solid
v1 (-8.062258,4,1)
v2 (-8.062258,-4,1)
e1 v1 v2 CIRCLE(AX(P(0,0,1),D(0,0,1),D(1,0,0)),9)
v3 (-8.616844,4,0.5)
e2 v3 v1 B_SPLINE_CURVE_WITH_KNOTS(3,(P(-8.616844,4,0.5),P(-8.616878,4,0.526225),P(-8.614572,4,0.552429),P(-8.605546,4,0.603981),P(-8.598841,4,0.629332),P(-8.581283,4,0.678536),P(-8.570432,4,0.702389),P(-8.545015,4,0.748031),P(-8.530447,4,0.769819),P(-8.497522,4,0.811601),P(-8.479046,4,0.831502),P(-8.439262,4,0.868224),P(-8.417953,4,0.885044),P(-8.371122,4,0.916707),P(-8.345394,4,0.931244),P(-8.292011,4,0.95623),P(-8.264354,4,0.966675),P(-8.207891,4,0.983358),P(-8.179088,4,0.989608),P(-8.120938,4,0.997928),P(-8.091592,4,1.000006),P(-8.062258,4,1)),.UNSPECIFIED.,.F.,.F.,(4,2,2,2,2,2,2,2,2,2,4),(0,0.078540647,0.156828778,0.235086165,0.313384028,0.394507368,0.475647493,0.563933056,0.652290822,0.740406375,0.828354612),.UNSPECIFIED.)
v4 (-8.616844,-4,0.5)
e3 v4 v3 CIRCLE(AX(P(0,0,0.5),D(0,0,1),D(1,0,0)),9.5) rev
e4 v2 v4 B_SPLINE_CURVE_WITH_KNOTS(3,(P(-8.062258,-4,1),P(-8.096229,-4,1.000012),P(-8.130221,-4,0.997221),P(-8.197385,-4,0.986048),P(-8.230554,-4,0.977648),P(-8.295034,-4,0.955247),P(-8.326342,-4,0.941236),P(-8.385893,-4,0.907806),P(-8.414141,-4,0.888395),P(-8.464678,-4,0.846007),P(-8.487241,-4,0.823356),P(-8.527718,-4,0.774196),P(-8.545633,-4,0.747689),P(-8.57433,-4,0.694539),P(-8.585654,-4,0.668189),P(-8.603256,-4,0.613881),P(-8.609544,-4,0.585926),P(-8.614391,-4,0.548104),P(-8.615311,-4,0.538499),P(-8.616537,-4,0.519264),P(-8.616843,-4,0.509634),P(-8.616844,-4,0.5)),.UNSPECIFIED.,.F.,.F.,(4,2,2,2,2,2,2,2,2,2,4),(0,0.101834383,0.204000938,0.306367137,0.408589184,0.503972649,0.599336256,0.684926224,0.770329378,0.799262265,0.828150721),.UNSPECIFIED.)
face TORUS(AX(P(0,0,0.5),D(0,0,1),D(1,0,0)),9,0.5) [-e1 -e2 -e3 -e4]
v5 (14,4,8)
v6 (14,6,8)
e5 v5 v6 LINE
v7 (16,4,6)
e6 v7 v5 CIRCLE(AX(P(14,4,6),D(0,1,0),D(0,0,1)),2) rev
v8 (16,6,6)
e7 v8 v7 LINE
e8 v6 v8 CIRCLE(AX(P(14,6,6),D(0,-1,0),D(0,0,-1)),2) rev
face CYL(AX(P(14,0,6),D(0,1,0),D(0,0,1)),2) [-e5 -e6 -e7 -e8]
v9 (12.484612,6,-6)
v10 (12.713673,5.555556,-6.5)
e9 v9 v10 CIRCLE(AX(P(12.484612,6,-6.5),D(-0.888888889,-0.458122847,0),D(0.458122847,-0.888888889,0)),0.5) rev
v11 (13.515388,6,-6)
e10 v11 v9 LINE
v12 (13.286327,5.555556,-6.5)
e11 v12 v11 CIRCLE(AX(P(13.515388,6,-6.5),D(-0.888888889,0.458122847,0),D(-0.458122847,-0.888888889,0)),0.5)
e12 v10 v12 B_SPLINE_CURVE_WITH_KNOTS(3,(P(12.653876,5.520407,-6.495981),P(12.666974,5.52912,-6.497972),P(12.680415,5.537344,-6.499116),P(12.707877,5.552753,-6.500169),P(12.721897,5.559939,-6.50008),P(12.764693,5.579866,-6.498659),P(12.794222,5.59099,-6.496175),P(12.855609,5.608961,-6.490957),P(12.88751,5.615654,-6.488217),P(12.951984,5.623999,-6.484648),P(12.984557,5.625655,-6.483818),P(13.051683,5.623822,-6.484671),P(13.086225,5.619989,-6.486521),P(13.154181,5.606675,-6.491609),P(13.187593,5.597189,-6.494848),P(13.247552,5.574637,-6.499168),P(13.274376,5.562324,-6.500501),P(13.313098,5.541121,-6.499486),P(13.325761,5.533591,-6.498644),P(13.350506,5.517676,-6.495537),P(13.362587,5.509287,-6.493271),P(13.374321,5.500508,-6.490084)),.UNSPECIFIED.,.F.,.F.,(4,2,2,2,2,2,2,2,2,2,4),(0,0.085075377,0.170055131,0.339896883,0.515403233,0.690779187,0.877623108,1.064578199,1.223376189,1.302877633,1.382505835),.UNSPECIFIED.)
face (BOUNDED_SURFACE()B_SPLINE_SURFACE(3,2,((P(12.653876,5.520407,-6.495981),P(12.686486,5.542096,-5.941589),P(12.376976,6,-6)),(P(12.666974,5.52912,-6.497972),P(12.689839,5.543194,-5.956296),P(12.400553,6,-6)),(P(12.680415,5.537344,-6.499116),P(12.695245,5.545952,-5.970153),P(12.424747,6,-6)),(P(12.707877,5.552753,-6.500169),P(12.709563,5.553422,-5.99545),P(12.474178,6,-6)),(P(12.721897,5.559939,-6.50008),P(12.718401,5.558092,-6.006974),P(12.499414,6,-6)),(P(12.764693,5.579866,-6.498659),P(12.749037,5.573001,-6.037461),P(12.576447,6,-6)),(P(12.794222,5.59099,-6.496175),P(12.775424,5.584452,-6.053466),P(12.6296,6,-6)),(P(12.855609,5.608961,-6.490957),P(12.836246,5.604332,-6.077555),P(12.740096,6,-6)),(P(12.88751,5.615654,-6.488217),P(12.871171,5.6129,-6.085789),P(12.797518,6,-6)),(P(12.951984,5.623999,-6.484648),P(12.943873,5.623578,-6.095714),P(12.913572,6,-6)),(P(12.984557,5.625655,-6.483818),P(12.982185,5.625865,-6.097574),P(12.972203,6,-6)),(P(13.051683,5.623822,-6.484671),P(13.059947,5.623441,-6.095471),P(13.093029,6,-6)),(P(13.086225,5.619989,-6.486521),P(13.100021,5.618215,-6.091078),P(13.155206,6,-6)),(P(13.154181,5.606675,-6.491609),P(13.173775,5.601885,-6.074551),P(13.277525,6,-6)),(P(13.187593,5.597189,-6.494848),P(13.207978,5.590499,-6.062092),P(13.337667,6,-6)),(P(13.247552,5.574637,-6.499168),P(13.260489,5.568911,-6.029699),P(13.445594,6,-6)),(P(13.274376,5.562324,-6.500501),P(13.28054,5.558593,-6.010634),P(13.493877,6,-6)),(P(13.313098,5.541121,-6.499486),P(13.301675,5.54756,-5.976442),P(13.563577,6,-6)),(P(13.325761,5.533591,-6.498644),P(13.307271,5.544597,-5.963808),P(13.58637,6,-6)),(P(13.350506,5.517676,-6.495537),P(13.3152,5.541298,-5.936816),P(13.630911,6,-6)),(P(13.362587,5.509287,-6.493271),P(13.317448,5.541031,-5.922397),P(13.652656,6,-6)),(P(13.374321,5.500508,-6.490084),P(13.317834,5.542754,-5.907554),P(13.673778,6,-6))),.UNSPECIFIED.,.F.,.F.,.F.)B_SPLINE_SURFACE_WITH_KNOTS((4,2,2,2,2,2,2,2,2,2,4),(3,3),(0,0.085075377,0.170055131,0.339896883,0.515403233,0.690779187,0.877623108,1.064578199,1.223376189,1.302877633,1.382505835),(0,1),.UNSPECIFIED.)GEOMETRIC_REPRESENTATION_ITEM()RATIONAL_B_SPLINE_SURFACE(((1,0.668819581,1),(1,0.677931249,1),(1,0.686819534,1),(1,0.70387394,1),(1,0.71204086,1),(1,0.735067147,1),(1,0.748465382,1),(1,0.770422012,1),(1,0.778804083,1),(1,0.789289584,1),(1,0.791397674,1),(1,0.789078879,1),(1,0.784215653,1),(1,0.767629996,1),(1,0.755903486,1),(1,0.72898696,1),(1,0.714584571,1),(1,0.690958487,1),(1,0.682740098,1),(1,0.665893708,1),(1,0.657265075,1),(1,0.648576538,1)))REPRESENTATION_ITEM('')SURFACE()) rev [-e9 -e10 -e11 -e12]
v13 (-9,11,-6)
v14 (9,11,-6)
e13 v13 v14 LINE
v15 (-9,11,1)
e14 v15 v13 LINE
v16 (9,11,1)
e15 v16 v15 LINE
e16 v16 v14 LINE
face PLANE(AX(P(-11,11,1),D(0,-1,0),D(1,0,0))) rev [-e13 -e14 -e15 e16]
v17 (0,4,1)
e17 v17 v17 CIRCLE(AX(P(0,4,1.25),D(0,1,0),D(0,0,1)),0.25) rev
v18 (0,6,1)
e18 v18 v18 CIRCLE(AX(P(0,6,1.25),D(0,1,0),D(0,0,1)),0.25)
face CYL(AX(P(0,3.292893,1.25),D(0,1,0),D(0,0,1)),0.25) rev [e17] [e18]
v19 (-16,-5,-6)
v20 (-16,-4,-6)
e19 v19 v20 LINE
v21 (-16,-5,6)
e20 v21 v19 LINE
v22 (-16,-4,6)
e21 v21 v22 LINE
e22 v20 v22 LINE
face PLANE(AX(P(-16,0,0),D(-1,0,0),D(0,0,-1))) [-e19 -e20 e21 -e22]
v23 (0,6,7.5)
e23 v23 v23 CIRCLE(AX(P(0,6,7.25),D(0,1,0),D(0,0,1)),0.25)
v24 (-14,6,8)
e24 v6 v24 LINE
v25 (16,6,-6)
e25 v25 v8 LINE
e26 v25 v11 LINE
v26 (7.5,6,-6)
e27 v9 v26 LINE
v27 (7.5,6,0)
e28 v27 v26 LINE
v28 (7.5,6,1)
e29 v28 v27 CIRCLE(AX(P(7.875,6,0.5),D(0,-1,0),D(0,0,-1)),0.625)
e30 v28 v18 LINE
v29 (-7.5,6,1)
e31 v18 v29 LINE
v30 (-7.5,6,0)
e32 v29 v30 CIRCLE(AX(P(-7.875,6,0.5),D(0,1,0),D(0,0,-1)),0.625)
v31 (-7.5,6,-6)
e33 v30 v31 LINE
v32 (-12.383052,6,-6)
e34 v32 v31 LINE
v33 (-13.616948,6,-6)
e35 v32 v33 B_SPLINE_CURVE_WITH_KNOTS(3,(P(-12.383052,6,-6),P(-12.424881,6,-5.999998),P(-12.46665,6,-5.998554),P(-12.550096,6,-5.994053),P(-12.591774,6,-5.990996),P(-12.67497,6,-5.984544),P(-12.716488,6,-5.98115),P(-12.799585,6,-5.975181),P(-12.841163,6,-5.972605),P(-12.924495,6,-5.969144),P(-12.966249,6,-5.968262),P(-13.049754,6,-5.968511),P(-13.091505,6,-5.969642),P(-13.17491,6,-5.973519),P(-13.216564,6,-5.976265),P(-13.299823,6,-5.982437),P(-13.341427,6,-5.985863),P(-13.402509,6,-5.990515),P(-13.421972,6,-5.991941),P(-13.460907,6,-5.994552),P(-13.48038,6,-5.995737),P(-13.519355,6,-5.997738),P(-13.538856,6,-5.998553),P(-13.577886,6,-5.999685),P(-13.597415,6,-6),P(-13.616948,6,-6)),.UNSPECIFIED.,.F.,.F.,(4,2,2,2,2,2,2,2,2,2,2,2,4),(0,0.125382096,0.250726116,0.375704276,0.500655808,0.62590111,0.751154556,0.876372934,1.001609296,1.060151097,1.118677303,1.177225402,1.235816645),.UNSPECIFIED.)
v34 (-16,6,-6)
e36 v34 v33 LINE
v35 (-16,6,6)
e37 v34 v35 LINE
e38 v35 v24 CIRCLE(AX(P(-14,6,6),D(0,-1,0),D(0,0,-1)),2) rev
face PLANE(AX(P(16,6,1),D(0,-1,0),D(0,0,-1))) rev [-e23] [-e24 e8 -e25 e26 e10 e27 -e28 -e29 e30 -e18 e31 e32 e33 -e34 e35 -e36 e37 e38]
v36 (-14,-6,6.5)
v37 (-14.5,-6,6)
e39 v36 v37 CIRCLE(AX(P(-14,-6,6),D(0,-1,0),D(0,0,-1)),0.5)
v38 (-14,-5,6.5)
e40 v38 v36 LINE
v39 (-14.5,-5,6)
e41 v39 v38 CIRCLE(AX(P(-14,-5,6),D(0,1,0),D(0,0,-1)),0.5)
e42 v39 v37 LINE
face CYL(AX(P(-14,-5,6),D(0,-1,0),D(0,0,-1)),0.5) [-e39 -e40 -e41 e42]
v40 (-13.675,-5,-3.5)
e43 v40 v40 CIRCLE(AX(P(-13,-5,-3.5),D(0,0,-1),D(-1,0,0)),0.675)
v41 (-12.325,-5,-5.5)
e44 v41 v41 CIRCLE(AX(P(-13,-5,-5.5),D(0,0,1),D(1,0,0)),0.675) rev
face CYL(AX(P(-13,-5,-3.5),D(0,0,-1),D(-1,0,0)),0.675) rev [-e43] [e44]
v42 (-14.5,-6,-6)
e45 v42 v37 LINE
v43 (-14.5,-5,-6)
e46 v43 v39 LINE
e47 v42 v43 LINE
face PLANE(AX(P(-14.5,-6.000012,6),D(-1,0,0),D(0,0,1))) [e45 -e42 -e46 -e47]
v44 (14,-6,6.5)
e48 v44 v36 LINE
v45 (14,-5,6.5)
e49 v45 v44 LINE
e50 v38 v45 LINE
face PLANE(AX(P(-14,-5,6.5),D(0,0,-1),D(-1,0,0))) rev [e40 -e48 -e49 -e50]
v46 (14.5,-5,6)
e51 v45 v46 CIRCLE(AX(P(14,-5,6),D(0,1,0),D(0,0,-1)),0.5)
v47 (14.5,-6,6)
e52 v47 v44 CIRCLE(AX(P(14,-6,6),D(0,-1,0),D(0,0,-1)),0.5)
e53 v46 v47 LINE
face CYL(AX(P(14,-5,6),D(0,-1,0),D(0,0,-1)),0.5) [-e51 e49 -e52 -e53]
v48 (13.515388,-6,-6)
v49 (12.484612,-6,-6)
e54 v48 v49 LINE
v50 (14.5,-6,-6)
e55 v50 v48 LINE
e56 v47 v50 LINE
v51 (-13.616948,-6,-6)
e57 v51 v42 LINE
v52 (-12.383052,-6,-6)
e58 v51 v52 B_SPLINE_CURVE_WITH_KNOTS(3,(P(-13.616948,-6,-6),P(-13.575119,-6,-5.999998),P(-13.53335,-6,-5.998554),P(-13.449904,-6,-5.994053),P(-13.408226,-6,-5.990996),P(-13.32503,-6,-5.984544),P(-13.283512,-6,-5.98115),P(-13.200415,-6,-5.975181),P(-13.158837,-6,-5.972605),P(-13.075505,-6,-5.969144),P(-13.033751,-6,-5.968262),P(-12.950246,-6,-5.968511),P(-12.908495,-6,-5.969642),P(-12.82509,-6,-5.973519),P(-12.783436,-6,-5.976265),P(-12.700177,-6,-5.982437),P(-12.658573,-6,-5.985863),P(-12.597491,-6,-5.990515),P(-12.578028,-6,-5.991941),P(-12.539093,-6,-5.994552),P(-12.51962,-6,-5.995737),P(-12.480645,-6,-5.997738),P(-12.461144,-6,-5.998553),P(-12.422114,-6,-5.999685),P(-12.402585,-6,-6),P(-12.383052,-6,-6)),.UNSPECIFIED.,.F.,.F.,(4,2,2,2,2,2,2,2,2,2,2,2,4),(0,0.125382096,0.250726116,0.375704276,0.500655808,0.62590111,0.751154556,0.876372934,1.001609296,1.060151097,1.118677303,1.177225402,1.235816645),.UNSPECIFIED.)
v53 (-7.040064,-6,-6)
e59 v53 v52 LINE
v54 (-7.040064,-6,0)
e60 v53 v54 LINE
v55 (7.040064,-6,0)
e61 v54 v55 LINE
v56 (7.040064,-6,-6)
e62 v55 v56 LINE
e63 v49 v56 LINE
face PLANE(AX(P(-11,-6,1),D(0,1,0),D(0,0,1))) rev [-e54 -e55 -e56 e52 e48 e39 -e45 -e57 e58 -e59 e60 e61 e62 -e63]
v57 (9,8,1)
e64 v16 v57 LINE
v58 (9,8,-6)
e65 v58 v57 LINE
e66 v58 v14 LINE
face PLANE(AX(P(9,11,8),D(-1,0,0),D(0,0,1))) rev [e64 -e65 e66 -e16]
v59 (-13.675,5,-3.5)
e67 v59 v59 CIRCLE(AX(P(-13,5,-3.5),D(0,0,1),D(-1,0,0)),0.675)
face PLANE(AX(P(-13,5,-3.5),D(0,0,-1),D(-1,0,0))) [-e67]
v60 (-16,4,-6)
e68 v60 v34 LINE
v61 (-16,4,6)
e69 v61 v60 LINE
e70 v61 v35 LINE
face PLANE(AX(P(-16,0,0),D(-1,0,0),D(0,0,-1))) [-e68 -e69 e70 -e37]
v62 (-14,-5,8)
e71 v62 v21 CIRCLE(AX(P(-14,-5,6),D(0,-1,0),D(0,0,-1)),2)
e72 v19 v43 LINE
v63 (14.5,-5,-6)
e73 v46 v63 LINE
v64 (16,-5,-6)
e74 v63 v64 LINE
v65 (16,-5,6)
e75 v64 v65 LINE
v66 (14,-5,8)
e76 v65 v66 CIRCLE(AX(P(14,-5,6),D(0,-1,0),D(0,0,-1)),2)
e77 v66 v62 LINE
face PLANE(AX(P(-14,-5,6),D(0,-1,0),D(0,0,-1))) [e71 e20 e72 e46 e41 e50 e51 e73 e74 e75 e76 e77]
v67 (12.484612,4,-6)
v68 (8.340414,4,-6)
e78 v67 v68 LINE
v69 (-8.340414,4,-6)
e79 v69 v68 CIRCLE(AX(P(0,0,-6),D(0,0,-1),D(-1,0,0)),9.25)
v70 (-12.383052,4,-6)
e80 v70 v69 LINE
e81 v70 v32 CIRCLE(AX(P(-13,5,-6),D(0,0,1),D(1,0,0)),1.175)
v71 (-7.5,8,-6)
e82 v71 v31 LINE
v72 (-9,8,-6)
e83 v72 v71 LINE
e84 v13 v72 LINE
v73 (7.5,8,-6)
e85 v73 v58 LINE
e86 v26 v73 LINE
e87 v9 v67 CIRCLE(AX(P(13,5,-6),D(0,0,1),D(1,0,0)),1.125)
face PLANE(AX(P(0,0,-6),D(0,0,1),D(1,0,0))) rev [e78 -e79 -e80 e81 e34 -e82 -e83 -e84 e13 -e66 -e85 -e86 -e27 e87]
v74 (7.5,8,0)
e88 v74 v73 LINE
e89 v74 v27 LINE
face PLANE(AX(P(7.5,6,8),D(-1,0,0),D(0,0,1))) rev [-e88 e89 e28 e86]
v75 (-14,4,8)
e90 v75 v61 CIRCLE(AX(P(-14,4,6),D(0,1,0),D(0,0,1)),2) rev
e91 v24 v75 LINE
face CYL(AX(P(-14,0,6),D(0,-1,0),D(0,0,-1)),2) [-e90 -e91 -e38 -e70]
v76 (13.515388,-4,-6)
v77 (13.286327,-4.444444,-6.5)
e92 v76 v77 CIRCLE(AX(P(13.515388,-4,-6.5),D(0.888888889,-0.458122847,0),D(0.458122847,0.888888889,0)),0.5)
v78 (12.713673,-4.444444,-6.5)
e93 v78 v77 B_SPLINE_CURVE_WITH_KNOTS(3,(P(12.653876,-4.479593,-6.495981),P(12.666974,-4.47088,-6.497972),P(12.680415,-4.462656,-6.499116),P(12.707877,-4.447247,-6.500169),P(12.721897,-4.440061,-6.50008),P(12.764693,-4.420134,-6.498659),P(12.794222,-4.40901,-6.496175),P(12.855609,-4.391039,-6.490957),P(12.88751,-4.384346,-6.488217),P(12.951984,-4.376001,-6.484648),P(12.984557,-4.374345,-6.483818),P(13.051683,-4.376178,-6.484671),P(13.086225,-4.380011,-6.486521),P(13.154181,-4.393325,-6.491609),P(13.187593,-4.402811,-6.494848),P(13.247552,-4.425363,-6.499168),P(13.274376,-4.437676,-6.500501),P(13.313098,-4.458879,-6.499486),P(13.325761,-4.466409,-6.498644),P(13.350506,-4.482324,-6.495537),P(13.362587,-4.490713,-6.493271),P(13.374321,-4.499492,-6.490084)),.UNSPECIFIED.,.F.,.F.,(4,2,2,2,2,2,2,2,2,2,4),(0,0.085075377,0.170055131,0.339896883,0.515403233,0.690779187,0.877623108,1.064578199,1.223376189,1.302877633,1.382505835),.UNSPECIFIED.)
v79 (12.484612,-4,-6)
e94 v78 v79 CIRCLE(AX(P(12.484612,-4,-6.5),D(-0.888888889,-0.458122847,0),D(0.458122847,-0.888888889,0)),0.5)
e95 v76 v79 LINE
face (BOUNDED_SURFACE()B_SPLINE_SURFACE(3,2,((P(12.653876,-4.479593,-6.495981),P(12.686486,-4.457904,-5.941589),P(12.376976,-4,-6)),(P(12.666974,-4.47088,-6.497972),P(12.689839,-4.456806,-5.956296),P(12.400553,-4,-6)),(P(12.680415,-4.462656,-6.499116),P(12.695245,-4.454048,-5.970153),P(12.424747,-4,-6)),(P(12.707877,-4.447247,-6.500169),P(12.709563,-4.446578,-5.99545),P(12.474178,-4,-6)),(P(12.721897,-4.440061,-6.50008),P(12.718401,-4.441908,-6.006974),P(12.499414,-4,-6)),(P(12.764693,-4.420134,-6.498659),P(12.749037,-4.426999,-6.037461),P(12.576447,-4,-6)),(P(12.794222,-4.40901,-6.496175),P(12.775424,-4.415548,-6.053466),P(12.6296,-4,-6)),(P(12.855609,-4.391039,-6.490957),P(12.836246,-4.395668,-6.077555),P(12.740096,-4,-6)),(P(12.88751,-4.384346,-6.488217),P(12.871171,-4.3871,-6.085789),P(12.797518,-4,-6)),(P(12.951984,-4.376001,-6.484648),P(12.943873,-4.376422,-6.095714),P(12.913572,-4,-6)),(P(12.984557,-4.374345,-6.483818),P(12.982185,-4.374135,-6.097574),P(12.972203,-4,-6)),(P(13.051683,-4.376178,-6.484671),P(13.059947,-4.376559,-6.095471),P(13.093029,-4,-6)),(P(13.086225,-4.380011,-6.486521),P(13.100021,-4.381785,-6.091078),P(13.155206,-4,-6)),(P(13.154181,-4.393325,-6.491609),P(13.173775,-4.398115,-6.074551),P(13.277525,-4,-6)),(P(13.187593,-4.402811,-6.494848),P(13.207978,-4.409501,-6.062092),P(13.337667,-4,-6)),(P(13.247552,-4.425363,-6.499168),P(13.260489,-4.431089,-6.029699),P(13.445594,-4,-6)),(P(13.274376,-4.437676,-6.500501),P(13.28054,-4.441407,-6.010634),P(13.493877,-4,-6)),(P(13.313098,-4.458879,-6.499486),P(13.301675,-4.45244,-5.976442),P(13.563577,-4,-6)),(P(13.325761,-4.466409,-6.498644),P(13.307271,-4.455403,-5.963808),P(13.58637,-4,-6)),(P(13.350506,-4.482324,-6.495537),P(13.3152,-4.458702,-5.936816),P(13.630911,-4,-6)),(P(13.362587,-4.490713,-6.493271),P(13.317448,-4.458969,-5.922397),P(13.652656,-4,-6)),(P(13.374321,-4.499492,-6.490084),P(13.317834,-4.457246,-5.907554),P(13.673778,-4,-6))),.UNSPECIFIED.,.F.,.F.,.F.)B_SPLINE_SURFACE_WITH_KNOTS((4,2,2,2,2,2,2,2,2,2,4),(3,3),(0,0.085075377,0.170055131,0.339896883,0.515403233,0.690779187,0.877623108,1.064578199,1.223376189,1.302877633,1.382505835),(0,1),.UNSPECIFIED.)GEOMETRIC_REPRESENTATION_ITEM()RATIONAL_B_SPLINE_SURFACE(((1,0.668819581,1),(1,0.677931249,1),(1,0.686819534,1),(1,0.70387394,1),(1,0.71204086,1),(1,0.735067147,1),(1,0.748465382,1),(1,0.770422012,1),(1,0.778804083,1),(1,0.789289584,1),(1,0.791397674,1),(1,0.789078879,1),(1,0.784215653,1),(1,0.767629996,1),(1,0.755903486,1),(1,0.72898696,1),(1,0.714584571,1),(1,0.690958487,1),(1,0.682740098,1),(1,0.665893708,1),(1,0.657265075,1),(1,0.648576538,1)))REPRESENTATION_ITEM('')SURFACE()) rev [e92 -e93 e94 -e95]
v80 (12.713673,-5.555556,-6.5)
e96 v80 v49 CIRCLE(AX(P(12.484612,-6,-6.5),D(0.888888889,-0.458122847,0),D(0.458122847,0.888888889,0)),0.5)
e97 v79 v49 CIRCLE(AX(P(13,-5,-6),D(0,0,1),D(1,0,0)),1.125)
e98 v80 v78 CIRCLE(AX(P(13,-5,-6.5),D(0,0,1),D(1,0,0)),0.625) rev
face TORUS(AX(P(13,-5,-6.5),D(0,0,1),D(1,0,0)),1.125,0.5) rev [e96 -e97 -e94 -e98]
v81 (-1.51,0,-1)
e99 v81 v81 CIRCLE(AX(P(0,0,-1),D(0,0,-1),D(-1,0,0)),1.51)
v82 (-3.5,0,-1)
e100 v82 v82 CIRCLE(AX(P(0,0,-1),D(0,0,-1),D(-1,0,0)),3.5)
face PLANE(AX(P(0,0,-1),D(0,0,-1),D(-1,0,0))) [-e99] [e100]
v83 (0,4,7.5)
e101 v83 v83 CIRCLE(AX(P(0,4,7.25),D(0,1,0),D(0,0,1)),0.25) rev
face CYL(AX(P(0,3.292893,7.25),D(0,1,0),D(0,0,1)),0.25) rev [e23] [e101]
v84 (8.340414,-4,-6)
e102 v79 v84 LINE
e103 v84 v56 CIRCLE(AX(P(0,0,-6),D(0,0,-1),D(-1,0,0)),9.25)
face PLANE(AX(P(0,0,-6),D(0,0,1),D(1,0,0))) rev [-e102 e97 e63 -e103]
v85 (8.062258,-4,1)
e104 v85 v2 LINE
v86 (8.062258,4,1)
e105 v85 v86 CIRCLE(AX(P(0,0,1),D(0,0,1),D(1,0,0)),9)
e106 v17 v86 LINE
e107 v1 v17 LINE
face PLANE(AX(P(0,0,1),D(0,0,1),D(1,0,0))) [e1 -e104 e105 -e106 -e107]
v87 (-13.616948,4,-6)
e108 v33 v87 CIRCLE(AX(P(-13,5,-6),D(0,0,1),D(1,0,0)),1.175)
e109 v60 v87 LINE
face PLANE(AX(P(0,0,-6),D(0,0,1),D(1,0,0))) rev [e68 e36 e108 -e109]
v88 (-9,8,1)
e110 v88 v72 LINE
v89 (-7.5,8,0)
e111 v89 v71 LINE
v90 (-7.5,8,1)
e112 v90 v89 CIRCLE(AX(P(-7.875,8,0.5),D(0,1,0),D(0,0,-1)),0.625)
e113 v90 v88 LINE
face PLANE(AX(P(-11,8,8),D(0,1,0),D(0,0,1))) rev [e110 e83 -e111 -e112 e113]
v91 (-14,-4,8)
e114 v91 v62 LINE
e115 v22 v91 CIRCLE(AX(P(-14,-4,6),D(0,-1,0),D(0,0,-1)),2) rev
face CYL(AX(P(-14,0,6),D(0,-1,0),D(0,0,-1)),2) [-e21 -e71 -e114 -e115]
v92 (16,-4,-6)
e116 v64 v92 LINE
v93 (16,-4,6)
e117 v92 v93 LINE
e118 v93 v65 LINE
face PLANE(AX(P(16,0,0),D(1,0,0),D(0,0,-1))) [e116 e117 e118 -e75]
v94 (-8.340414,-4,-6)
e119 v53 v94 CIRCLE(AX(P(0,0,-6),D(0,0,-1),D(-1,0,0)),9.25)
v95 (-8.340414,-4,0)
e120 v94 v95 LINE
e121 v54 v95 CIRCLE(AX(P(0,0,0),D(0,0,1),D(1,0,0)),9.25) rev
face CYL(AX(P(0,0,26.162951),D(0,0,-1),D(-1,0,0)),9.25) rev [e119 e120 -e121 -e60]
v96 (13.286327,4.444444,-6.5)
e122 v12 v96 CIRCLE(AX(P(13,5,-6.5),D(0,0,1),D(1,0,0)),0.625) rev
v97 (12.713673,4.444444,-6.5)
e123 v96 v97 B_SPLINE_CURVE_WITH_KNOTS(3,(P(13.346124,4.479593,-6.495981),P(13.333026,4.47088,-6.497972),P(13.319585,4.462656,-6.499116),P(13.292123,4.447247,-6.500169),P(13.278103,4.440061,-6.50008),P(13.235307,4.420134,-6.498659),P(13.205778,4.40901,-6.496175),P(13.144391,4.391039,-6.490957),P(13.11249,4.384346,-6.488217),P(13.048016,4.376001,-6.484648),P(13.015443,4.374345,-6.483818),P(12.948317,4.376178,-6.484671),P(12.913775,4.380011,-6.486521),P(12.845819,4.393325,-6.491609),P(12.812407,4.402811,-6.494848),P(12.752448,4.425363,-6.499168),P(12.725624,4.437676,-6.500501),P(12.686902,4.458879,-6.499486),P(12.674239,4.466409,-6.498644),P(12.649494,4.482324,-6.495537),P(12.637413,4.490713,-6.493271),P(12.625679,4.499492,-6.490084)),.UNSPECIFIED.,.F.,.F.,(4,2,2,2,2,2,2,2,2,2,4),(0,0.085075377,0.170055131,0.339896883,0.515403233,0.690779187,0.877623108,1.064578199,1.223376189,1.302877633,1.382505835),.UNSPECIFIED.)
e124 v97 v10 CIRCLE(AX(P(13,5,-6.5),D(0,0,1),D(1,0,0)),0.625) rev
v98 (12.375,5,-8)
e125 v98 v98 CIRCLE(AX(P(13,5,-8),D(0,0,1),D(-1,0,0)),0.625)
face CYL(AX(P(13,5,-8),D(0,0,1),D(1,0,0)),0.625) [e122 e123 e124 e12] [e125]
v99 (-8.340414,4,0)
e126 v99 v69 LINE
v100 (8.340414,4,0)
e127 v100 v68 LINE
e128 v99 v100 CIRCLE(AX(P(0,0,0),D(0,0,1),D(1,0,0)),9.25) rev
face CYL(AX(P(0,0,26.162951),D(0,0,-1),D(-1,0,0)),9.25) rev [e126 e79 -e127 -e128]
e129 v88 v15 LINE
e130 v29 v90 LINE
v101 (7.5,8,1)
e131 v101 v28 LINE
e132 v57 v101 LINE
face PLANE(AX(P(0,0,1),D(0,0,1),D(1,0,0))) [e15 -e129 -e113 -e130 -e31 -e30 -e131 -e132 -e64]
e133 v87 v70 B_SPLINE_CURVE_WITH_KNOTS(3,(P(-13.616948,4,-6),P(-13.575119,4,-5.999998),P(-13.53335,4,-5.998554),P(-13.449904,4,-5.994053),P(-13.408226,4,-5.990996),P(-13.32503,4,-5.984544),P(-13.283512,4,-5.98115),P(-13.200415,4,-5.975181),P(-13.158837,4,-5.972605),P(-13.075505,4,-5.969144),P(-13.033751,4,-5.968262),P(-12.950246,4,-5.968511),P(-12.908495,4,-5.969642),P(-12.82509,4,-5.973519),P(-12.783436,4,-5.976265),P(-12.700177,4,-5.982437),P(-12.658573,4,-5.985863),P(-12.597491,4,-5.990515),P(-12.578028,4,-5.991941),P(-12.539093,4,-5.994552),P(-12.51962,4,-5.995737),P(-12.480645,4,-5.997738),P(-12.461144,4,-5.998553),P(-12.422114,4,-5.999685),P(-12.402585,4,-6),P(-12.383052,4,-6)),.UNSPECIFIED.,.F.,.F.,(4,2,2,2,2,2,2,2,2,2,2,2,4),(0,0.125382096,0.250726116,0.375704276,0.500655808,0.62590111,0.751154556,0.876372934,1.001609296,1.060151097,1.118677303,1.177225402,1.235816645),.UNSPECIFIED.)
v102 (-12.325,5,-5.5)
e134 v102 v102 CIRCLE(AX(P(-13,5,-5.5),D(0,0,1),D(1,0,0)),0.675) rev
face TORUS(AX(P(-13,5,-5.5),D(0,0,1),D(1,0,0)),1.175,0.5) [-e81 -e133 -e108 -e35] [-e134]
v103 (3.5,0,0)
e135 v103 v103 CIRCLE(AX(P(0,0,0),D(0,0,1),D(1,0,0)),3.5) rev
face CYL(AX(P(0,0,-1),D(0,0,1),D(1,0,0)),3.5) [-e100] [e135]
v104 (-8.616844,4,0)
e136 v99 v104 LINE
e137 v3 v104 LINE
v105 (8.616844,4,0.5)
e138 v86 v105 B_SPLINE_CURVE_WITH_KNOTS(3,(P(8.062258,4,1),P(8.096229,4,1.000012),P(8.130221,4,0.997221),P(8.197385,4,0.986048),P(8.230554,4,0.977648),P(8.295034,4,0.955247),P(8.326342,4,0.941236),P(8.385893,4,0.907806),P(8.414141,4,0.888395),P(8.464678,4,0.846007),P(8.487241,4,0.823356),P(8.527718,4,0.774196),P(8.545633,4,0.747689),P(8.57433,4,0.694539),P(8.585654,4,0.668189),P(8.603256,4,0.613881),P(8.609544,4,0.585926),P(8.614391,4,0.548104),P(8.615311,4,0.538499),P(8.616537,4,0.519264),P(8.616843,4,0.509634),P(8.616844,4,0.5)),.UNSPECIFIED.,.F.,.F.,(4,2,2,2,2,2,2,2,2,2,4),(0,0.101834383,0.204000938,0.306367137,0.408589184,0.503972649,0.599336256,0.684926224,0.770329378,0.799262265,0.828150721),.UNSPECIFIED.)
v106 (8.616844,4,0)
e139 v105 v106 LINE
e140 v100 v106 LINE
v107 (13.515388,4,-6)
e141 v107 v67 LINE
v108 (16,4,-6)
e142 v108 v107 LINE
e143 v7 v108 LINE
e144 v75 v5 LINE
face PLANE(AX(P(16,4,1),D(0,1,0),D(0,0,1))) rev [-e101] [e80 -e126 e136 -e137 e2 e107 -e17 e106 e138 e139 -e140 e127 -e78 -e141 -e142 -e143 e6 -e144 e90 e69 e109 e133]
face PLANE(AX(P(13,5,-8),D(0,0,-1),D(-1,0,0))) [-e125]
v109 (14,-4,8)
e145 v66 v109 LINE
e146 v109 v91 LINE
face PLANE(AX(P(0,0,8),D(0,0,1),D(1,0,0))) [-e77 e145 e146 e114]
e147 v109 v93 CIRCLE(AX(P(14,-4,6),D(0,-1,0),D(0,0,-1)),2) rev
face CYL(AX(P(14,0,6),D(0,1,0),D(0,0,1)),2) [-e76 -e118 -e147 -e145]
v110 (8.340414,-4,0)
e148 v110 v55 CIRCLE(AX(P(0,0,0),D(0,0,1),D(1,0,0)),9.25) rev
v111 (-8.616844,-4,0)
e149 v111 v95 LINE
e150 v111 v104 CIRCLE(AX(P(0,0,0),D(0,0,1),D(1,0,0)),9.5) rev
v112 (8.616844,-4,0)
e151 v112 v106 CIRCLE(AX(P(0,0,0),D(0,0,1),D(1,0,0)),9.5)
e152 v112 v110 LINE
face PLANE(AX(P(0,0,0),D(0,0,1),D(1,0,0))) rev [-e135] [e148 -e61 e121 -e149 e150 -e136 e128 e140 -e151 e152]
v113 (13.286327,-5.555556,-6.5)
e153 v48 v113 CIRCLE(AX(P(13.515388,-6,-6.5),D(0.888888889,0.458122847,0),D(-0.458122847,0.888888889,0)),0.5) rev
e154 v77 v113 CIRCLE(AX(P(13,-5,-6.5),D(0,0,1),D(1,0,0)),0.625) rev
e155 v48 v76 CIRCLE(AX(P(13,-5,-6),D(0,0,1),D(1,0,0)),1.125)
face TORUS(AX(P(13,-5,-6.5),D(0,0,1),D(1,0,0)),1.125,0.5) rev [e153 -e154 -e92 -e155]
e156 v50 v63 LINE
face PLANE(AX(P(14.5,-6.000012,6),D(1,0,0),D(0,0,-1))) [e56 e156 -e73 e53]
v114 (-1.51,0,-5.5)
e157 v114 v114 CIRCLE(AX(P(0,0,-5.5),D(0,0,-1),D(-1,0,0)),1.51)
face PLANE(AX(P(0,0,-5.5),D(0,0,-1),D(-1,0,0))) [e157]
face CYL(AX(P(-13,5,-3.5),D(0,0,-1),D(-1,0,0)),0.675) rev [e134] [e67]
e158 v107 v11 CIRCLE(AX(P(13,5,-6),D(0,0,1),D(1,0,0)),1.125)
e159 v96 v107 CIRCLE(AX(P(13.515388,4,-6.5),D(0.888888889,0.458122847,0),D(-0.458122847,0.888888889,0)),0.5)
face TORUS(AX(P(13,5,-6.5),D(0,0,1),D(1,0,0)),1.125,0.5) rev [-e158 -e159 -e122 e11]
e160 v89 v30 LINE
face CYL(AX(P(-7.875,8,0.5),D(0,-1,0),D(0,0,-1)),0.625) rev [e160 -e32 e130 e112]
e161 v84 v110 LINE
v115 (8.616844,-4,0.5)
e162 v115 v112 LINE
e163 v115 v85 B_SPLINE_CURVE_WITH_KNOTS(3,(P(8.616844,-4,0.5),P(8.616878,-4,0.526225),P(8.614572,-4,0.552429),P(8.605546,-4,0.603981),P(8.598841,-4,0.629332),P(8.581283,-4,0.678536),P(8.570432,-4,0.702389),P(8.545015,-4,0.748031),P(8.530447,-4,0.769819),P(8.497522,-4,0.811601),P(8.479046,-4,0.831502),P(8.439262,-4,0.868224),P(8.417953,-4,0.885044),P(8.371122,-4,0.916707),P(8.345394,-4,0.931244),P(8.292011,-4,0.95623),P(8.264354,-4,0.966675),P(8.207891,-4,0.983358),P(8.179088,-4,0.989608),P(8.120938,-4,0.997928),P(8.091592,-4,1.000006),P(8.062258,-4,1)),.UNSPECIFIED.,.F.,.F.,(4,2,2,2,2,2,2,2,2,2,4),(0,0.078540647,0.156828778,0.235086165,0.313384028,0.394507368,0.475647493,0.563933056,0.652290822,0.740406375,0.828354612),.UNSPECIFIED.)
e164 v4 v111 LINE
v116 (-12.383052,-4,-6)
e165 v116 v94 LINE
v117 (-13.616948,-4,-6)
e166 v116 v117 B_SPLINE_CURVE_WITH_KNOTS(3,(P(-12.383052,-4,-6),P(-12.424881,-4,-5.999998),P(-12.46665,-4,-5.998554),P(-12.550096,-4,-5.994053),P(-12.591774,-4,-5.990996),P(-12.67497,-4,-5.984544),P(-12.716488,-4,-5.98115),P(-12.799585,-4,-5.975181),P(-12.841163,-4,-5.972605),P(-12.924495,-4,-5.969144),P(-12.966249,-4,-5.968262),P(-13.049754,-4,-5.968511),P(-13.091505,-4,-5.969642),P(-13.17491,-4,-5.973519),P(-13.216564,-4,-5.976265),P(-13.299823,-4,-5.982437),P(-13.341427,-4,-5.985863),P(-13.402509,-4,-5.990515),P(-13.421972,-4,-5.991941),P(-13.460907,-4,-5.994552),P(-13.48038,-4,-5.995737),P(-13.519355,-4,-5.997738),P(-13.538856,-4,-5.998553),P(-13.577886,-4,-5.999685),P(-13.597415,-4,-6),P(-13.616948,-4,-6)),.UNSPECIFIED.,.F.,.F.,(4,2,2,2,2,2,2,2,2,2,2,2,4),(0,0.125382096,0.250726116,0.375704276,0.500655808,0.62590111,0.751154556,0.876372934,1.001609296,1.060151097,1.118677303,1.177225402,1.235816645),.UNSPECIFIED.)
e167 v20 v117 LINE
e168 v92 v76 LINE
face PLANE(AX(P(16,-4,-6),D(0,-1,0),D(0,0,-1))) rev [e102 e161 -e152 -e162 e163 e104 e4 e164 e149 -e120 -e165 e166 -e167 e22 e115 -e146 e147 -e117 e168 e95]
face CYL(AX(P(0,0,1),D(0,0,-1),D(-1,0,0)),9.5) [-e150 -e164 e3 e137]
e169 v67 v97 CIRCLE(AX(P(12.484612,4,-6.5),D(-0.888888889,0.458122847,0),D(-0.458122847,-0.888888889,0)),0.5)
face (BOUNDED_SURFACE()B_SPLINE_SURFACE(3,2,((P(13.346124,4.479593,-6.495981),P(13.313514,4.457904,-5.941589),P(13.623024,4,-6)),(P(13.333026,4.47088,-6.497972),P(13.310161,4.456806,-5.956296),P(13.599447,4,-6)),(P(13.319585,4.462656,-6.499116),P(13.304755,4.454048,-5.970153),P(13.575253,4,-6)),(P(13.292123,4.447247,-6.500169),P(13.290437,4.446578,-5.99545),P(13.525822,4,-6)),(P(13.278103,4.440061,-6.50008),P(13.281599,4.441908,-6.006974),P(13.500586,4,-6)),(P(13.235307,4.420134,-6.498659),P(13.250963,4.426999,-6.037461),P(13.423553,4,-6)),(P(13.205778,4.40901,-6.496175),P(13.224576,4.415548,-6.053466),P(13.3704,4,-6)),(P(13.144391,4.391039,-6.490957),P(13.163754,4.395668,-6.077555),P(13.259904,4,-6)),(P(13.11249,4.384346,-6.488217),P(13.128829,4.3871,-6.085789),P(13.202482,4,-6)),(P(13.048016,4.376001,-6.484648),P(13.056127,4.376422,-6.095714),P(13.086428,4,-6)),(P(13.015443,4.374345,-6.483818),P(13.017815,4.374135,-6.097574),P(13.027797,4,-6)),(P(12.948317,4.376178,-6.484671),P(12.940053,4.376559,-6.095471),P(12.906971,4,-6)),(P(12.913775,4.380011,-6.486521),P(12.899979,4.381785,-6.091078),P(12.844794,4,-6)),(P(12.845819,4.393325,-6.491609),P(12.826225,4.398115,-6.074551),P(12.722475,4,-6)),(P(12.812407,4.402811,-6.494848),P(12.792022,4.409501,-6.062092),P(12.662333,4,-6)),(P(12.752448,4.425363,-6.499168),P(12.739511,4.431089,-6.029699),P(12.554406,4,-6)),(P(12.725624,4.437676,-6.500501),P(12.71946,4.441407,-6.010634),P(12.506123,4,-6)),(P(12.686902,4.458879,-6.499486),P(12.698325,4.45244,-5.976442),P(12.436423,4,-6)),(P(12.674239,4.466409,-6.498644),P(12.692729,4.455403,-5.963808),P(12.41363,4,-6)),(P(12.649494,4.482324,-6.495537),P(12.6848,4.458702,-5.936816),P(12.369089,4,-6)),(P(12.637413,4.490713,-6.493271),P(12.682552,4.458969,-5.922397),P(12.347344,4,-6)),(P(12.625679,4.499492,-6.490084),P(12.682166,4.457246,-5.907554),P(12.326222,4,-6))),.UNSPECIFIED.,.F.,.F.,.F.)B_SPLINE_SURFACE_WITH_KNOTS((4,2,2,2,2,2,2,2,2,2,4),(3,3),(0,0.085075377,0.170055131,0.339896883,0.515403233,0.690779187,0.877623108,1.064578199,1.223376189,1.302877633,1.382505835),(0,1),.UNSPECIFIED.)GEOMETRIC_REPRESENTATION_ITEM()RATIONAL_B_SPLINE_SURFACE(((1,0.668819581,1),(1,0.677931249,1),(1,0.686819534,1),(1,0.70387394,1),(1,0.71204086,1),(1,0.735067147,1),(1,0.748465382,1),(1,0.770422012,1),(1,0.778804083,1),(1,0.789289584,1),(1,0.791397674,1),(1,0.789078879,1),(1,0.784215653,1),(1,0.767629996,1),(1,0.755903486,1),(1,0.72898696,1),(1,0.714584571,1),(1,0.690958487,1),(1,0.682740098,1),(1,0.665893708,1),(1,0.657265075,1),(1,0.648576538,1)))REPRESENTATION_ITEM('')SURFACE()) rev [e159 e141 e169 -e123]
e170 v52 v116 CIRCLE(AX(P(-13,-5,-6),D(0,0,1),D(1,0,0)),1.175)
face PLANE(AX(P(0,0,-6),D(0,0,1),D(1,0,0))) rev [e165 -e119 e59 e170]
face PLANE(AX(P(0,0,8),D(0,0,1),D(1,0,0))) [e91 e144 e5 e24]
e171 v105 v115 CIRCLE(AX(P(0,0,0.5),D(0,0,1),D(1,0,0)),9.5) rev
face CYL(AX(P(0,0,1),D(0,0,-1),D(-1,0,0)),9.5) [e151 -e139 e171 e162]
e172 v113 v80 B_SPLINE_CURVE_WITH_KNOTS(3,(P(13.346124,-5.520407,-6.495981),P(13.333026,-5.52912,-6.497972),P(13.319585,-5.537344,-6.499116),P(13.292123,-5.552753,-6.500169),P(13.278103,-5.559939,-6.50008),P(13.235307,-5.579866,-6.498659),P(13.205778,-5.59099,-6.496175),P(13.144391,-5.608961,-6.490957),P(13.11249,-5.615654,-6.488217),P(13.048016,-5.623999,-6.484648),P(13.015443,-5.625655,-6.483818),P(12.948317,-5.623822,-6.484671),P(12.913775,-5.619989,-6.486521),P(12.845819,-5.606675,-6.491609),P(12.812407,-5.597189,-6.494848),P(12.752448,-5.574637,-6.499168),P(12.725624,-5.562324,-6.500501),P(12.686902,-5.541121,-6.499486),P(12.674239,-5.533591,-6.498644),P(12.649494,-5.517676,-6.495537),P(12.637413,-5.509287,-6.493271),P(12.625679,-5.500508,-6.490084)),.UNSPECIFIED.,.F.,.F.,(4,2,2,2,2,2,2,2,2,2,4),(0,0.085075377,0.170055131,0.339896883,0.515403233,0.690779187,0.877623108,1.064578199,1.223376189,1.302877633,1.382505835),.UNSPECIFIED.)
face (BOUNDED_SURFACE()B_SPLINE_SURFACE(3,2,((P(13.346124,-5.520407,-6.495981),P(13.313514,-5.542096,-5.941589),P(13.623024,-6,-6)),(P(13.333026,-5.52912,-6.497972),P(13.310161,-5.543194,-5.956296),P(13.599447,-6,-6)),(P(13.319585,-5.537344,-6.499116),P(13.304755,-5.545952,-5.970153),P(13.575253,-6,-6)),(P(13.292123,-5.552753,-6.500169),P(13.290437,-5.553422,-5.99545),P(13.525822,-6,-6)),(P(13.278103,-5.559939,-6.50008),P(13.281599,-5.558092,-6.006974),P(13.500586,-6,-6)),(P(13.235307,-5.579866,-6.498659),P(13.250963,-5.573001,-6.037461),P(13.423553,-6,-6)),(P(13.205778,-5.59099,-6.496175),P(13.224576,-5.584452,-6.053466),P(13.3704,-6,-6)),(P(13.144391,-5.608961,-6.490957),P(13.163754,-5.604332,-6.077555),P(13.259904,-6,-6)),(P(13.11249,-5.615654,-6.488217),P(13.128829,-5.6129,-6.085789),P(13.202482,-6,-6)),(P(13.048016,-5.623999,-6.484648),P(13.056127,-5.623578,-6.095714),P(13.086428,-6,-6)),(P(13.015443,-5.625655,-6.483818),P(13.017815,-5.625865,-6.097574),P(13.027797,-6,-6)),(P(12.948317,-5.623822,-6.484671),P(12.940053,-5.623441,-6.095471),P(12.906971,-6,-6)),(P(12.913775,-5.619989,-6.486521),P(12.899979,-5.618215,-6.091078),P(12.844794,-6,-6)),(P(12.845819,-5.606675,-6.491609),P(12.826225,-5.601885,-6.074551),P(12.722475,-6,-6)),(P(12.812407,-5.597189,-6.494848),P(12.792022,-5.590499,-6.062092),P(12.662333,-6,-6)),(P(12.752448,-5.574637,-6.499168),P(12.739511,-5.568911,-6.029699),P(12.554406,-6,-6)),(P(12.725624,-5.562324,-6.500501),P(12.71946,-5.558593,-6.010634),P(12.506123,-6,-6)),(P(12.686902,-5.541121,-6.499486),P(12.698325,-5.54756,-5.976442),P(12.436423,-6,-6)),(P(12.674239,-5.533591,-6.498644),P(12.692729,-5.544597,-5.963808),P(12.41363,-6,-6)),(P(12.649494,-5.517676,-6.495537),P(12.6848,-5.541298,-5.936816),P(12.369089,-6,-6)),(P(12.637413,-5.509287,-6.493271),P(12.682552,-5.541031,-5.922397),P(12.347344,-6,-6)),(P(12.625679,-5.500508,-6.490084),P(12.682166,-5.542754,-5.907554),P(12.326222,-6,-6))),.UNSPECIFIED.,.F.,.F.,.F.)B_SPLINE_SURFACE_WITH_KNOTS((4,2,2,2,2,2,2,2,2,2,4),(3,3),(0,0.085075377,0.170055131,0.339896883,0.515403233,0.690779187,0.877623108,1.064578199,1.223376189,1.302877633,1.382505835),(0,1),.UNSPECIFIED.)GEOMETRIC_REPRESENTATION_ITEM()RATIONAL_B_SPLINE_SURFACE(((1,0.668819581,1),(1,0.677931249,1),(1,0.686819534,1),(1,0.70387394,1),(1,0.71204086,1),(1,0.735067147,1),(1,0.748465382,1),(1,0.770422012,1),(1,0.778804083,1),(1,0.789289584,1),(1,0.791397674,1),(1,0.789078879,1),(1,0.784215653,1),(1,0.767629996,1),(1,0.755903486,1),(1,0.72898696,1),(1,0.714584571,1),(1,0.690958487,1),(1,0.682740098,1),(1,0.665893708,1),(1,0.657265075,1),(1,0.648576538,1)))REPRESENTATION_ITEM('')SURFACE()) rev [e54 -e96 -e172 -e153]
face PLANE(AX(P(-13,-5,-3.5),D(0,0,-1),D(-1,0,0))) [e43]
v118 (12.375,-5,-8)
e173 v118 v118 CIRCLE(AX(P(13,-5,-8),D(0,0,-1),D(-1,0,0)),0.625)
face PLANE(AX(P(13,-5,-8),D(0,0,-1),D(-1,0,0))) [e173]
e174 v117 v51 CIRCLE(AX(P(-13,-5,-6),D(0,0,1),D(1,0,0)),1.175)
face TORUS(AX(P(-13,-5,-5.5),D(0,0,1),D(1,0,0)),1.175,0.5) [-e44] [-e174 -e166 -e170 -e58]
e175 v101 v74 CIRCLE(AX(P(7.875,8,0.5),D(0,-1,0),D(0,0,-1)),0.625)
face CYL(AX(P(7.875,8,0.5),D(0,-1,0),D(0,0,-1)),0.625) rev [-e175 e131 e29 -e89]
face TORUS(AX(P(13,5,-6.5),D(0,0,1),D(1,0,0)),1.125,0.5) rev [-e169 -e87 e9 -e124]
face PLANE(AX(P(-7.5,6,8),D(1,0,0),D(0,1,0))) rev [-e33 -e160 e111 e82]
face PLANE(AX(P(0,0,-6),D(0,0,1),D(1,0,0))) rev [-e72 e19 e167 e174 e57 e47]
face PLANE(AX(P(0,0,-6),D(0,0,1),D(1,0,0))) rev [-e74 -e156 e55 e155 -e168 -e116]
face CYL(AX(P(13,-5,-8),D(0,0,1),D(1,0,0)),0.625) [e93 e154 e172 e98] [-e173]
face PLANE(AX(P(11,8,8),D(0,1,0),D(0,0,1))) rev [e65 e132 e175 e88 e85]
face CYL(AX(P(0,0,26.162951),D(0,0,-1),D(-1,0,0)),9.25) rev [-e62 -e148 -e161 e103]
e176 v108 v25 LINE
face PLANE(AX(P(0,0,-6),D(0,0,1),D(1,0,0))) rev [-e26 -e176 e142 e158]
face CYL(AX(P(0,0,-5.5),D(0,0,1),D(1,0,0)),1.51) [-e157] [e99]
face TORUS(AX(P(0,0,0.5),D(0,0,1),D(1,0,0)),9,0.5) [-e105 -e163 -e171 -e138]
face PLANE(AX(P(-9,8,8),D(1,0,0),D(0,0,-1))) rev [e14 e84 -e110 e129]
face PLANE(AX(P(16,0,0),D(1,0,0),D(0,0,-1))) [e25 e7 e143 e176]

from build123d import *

# Parameters (mm, degrees)
BOSS_EXTRUDE1_DEPTH     = 1
SKETCH2_R               = 1.51
BOSS_EXTRUDE2_DEPTH     = 5.5
SKETCH3_R               = 3.5
BOSS_EXTRUDE3_DEPTH     = 1
SKETCH4_W               = 2
SKETCH4_H               = 17
BOSS_EXTRUDE4_DEPTH     = 6
SKETCH5_W               = 18
SKETCH5_H               = 2
BOSS_EXTRUDE5_DEPTH     = 6
SKETCH6_W               = 7
SKETCH6_H               = 2
BOSS_EXTRUDE6_DEPTH     = 5
BOSS_EXTRUDE7_DEPTH     = 6
CUT_EXTRUDE1_DEPTH      = 21.639767441
SKETCH9_W               = 2.937742252
SKETCH9_H               = 8
CUT_EXTRUDE2_DEPTH      = 6
CUT_EXTRUDE11_START     = -6
SKETCH21_R              = 9.25
SKETCH21_R_2            = 3.5
CUT_EXTRUDE11_DEPTH     = 6
SKETCH10_W              = 32
SKETCH10_H              = 2
BOSS_EXTRUDE8_DEPTH     = 7
FILLET1_R               = 0.5
SKETCH11_R              = 0.625
BOSS_EXTRUDE9_DEPTH     = 2
SKETCH14_W              = 3.5
SKETCH14_H              = 2
CUT_EXTRUDE5_DEPTH      = 24.937418532
SKETCH12_R              = 0.675
CUT_EXTRUDE3_DEPTH      = 2.5
CUT_EXTRUDE6_DEPTH      = 2
FILLET2_R               = 0.5
FILLET3_R               = 0.5
FILLET4_R               = 2
CUT_EXTRUDE7_DEPTH      = 25.677925456
CUT_EXTRUDE7_DEPTH_BACK = 1
SKETCH19_R              = 0.25
CUT_EXTRUDE9_DEPTH      = 2
SKETCH20_W              = 2
SKETCH20_H              = 3
CUT_EXTRUDE10_DEPTH     = 24.937418532


with BuildPart() as part:
    # Sketch1 → Boss-Extrude1 (new body)
    with BuildSketch(Plane.XY):
        Polygon((-11, 6), (-11, 11), (11, 11), (11, 6), (11, -6), (-11, -6), align=None)
    extrude(amount=BOSS_EXTRUDE1_DEPTH)

    # Sketch2 → Boss-Extrude2 (add)
    with BuildSketch(Plane(origin=(0, 0, 0), x_dir=(-1, 0, 0), z_dir=(0, 0, -1))):
        with Locations(Location((0, 0, 0), (0, 0, 180))):
            Circle(SKETCH2_R)
    extrude(amount=BOSS_EXTRUDE2_DEPTH)

    # Sketch3 → Boss-Extrude3 (add)
    with BuildSketch(Plane(origin=(0, 0, 0), x_dir=(-1, 0, 0), z_dir=(0, 0, -1))):
        with Locations(Location((0, 0, 0), (0, 0, 180))):
            Circle(SKETCH3_R)
    extrude(amount=BOSS_EXTRUDE3_DEPTH)

    # Sketch4 → Boss-Extrude4 (add)
    with BuildSketch(Plane(origin=(0, 0, 0), x_dir=(-1, 0, 0), z_dir=(0, 0, -1))):
        with Locations((10, 2.5)):
            Rectangle(SKETCH4_W, SKETCH4_H)
        with Locations((-10, 2.5)):
            Rectangle(SKETCH4_W, SKETCH4_H)
    extrude(amount=BOSS_EXTRUDE4_DEPTH)

    # Sketch5 → Boss-Extrude5 (add)
    with BuildSketch(Plane(origin=(0, 0, 0), x_dir=(-1, 0, 0), z_dir=(0, 0, -1))):
        with Locations((0, 10)):
            Rectangle(SKETCH5_W, SKETCH5_H)
    extrude(amount=BOSS_EXTRUDE5_DEPTH)

    # Sketch6 → Boss-Extrude6 (add)
    with BuildSketch(Plane(origin=(11, 0, 0), x_dir=(0, 0, -1), z_dir=(1, 0, 0))):
        with Locations((2.5, -5)):
            Rectangle(SKETCH6_W, SKETCH6_H)
        with Locations((2.5, 5)):
            Rectangle(SKETCH6_W, SKETCH6_H)
    boss_extrude6 = extrude(amount=BOSS_EXTRUDE6_DEPTH)

    # Mirror1: Boss-Extrude6 across plane
    add(boss_extrude6.mirror(Plane(origin=(0, 0, 0), x_dir=(0, 0, 1), z_dir=(1, 0, 0))))

    # Sketch7 → Boss-Extrude7 (add)
    with BuildSketch(Plane(origin=(0, 0, -6), x_dir=(-1, 0, 0), z_dir=(0, 0, -1))):
        with BuildLine():
            ThreePointArc((-6.708203932, -6), (-8.407551231, -3.211398808), (-9, 0))
            Line((-9, 0), (-9, -6))
            Line((-9, -6), (-6.708203932, -6))
        make_face()
        with BuildLine():
            Line((-9, 9), (-9, 0))
            ThreePointArc((-9, 0), (-6.363961031, 6.363961031), (0, 9))
            Line((0, 9), (-9, 9))
        make_face()
    boss_extrude7 = extrude(amount=-BOSS_EXTRUDE7_DEPTH)

    # Sketch8 → Cut-Extrude1 (cut, through all)
    with BuildSketch(Plane(origin=(0, 0, -6), x_dir=(-1, 0, 0), z_dir=(0, 0, -1))):
        with BuildLine():
            Line((-11, 4), (-8.61684397, 4))
            ThreePointArc((-8.61684397, 4), (-9.5, 0), (-8.61684397, -4))
            Line((-8.61684397, -4), (-11, -4))
            Line((-11, -4), (-11, 4))
        make_face()
    cut_extrude1 = extrude(amount=-CUT_EXTRUDE1_DEPTH, mode=Mode.SUBTRACT)

    # Sketch9 → Cut-Extrude2 (cut)
    with BuildSketch(Plane(origin=(0, 0, -6), x_dir=(-1, 0, 0), z_dir=(0, 0, -1))):
        with Locations((-9.531128874, 0)):
            Rectangle(SKETCH9_W, SKETCH9_H)
    cut_extrude2 = extrude(amount=-CUT_EXTRUDE2_DEPTH, mode=Mode.SUBTRACT)

    # Mirror2: Boss-Extrude7, Cut-Extrude1, Cut-Extrude2 across plane
    add(boss_extrude7.mirror(Plane(origin=(0, 0, 0), x_dir=(0, 0, 1), z_dir=(1, 0, 0))))
    add(cut_extrude1.mirror(Plane(origin=(0, 0, 0), x_dir=(0, 0, 1), z_dir=(1, 0, 0))), mode=Mode.SUBTRACT)
    add(cut_extrude2.mirror(Plane(origin=(0, 0, 0), x_dir=(0, 0, 1), z_dir=(1, 0, 0))), mode=Mode.SUBTRACT)

    # Sketch21 → Cut-Extrude11 (cut)
    with BuildSketch(Plane(origin=(0, 0, -6), x_dir=(-1, 0, 0), z_dir=(0, 0, -1)).offset(CUT_EXTRUDE11_START)):
        Circle(SKETCH21_R)
        with Locations(Location((0, 0, 0), (0, 0, 180))):
            Circle(SKETCH21_R_2, mode=Mode.SUBTRACT)
    extrude(amount=CUT_EXTRUDE11_DEPTH, mode=Mode.SUBTRACT)

    # Sketch10 → Boss-Extrude8 (add)
    with BuildSketch(Plane.XY.offset(1)):
        with Locations((0, -5)):
            Rectangle(SKETCH10_W, SKETCH10_H)
        with Locations((0, 5)):
            Rectangle(SKETCH10_W, SKETCH10_H)
    extrude(amount=BOSS_EXTRUDE8_DEPTH)

    # Fillet1
    fillet1_edges = [part.edges().sort_by_distance(p)[0] for p in [
        (9.5, 0, 1),
        (-9.5, 0, 1),
    ]]
    fillet(fillet1_edges, radius=FILLET1_R)

    # Sketch11 → Boss-Extrude9 (add)
    with BuildSketch(Plane(origin=(0, 0, -6), x_dir=(-1, 0, 0), z_dir=(0, 0, -1))):
        with Locations(Location((-13, -5, 0), (0, 0, 180))):
            Circle(SKETCH11_R)
    boss_extrude9 = extrude(amount=BOSS_EXTRUDE9_DEPTH)

    # Sketch14 → Cut-Extrude5 (cut, through all)
    with BuildSketch(Plane(origin=(0, 0, -6), x_dir=(-1, 0, 0), z_dir=(0, 0, -1))):
        with Locations((9.25, 7)):
            Rectangle(SKETCH14_W, SKETCH14_H)
        with Locations((-9.25, 7)):
            Rectangle(SKETCH14_W, SKETCH14_H)
    extrude(amount=-CUT_EXTRUDE5_DEPTH, mode=Mode.SUBTRACT)

    # Sketch12 → Cut-Extrude3 (cut)
    with BuildSketch(Plane(origin=(0, 0, -6), x_dir=(-1, 0, 0), z_dir=(0, 0, -1))):
        with Locations((13, -5)):
            Circle(SKETCH12_R)
    cut_extrude3 = extrude(amount=-CUT_EXTRUDE3_DEPTH, mode=Mode.SUBTRACT)

    # Sketch16 → Cut-Extrude6 (cut)
    with BuildSketch(Plane(origin=(0, 6, 0), x_dir=(1, 0, 0), z_dir=(0, 1, 0))):
        with BuildLine():
            Line((-7.5, 0), (-7.5, -1))
            ThreePointArc((-7.5, -1), (-7.25, -0.5), (-7.5, 0))
        make_face()
    cut_extrude6 = extrude(amount=CUT_EXTRUDE6_DEPTH, mode=Mode.SUBTRACT)

    # Mirror3: Boss-Extrude9, Cut-Extrude3 across plane
    add(boss_extrude9.mirror(Plane.ZX))
    add(cut_extrude3.mirror(Plane.ZX), mode=Mode.SUBTRACT)

    # Mirror4: Cut-Extrude6 across plane
    add(cut_extrude6.mirror(Plane(origin=(0, 0, 0), x_dir=(0, 0, 1), z_dir=(1, 0, 0))), mode=Mode.SUBTRACT)

    # Fillet2
    fillet2_edges = [part.edges().sort_by_distance(p)[0] for p in [
        (12.375, -5, -6),
        (12.375, 5, -6),
    ]]
    fillet(fillet2_edges, radius=FILLET2_R)

    # Fillet3
    # the kernel refuses this fillet: 0.5 mm, written as the material it takes off along each edge
    with BuildSketch(Plane(origin=(-13, -5, -6), x_dir=(-1, 0, 0), z_dir=(0, -1, 0))) as fillet3_piece_1:
        with BuildLine():
            CenterArc((0.675 + FILLET3_R, -FILLET3_R), FILLET3_R, 90, 90)
            Line((0.675, -FILLET3_R), (0.675, 0))
            Line((0.675, 0), (0.675 + FILLET3_R, 0))
        make_face()
    revolve(axis=Axis((-13, -5, -6), (0, 0, -1)), mode=Mode.SUBTRACT)
    with BuildSketch(Plane(origin=(-13, 5, -6), x_dir=(-1, 0, 0), z_dir=(0, 1, 0))) as fillet3_piece_2:
        with BuildLine():
            CenterArc((0.675 + FILLET3_R, FILLET3_R), FILLET3_R, 180, 90)
            Line((0.675, FILLET3_R), (0.675, 0))
            Line((0.675, 0), (0.675 + FILLET3_R, 0))
        make_face()
    revolve(axis=Axis((-13, 5, -6), (0, 0, 1)), mode=Mode.SUBTRACT)

    # Fillet4
    fillet4_edges = [part.edges().sort_by_distance(p)[0] for p in [
        (16, -5, 8),
        (-16, -5, 8),
        (-16, 5, 8),
        (16, 5, 8),
    ]]
    fillet(fillet4_edges, radius=FILLET4_R)

    # Sketch17 → Cut-Extrude7 (cut, two sides: drawn at the far end of the back side and taken through both)
    with BuildSketch(Plane.XZ.offset(6).offset(-CUT_EXTRUDE7_DEPTH_BACK)):
        with BuildLine():
            Line((-16, 6), (-16, -6))
            Line((-16, -6), (-14.5, -6))
            Line((-14.5, -6), (-14.5, 6))
            ThreePointArc((-14.5, 6), (-14.353553391, 6.353553391), (-14, 6.5))
            Line((-14, 6.5), (14, 6.5))
            ThreePointArc((14, 6.5), (14.353553391, 6.353553391), (14.5, 6))
            Line((14.5, 6), (14.5, -6))
            Line((14.5, -6), (16, -6))
            Line((16, -6), (16, 6))
            ThreePointArc((16, 6), (15.414213562, 7.414213562), (14, 8))
            Line((14, 8), (-14, 8))
            ThreePointArc((-14, 8), (-15.414213562, 7.414213562), (-16, 6))
        make_face()
    extrude(amount=CUT_EXTRUDE7_DEPTH + CUT_EXTRUDE7_DEPTH_BACK, mode=Mode.SUBTRACT)

    # Sketch19 → Cut-Extrude9 (cut)
    with BuildSketch(Plane(origin=(0, 6, 0), x_dir=(1, 0, 0), z_dir=(0, 1, 0))):
        with Locations(Location((0, -1.25, 0), (0, 0, 90))):
            Circle(SKETCH19_R)
        with Locations(Location((0, -7.25, 0), (0, 0, 270))):
            Circle(SKETCH19_R)
    extrude(amount=-CUT_EXTRUDE9_DEPTH, mode=Mode.SUBTRACT)

    # Sketch20 → Cut-Extrude10 (cut, through all)
    with BuildSketch(Plane(origin=(0, 0, -6), x_dir=(-1, 0, 0), z_dir=(0, 0, -1))):
        with Locations((-10, 9.5)):
            Rectangle(SKETCH20_W, SKETCH20_H)
        with Locations((10, 9.5)):
            Rectangle(SKETCH20_W, SKETCH20_H)
    extrude(amount=-CUT_EXTRUDE10_DEPTH, mode=Mode.SUBTRACT)


solid = part.part
